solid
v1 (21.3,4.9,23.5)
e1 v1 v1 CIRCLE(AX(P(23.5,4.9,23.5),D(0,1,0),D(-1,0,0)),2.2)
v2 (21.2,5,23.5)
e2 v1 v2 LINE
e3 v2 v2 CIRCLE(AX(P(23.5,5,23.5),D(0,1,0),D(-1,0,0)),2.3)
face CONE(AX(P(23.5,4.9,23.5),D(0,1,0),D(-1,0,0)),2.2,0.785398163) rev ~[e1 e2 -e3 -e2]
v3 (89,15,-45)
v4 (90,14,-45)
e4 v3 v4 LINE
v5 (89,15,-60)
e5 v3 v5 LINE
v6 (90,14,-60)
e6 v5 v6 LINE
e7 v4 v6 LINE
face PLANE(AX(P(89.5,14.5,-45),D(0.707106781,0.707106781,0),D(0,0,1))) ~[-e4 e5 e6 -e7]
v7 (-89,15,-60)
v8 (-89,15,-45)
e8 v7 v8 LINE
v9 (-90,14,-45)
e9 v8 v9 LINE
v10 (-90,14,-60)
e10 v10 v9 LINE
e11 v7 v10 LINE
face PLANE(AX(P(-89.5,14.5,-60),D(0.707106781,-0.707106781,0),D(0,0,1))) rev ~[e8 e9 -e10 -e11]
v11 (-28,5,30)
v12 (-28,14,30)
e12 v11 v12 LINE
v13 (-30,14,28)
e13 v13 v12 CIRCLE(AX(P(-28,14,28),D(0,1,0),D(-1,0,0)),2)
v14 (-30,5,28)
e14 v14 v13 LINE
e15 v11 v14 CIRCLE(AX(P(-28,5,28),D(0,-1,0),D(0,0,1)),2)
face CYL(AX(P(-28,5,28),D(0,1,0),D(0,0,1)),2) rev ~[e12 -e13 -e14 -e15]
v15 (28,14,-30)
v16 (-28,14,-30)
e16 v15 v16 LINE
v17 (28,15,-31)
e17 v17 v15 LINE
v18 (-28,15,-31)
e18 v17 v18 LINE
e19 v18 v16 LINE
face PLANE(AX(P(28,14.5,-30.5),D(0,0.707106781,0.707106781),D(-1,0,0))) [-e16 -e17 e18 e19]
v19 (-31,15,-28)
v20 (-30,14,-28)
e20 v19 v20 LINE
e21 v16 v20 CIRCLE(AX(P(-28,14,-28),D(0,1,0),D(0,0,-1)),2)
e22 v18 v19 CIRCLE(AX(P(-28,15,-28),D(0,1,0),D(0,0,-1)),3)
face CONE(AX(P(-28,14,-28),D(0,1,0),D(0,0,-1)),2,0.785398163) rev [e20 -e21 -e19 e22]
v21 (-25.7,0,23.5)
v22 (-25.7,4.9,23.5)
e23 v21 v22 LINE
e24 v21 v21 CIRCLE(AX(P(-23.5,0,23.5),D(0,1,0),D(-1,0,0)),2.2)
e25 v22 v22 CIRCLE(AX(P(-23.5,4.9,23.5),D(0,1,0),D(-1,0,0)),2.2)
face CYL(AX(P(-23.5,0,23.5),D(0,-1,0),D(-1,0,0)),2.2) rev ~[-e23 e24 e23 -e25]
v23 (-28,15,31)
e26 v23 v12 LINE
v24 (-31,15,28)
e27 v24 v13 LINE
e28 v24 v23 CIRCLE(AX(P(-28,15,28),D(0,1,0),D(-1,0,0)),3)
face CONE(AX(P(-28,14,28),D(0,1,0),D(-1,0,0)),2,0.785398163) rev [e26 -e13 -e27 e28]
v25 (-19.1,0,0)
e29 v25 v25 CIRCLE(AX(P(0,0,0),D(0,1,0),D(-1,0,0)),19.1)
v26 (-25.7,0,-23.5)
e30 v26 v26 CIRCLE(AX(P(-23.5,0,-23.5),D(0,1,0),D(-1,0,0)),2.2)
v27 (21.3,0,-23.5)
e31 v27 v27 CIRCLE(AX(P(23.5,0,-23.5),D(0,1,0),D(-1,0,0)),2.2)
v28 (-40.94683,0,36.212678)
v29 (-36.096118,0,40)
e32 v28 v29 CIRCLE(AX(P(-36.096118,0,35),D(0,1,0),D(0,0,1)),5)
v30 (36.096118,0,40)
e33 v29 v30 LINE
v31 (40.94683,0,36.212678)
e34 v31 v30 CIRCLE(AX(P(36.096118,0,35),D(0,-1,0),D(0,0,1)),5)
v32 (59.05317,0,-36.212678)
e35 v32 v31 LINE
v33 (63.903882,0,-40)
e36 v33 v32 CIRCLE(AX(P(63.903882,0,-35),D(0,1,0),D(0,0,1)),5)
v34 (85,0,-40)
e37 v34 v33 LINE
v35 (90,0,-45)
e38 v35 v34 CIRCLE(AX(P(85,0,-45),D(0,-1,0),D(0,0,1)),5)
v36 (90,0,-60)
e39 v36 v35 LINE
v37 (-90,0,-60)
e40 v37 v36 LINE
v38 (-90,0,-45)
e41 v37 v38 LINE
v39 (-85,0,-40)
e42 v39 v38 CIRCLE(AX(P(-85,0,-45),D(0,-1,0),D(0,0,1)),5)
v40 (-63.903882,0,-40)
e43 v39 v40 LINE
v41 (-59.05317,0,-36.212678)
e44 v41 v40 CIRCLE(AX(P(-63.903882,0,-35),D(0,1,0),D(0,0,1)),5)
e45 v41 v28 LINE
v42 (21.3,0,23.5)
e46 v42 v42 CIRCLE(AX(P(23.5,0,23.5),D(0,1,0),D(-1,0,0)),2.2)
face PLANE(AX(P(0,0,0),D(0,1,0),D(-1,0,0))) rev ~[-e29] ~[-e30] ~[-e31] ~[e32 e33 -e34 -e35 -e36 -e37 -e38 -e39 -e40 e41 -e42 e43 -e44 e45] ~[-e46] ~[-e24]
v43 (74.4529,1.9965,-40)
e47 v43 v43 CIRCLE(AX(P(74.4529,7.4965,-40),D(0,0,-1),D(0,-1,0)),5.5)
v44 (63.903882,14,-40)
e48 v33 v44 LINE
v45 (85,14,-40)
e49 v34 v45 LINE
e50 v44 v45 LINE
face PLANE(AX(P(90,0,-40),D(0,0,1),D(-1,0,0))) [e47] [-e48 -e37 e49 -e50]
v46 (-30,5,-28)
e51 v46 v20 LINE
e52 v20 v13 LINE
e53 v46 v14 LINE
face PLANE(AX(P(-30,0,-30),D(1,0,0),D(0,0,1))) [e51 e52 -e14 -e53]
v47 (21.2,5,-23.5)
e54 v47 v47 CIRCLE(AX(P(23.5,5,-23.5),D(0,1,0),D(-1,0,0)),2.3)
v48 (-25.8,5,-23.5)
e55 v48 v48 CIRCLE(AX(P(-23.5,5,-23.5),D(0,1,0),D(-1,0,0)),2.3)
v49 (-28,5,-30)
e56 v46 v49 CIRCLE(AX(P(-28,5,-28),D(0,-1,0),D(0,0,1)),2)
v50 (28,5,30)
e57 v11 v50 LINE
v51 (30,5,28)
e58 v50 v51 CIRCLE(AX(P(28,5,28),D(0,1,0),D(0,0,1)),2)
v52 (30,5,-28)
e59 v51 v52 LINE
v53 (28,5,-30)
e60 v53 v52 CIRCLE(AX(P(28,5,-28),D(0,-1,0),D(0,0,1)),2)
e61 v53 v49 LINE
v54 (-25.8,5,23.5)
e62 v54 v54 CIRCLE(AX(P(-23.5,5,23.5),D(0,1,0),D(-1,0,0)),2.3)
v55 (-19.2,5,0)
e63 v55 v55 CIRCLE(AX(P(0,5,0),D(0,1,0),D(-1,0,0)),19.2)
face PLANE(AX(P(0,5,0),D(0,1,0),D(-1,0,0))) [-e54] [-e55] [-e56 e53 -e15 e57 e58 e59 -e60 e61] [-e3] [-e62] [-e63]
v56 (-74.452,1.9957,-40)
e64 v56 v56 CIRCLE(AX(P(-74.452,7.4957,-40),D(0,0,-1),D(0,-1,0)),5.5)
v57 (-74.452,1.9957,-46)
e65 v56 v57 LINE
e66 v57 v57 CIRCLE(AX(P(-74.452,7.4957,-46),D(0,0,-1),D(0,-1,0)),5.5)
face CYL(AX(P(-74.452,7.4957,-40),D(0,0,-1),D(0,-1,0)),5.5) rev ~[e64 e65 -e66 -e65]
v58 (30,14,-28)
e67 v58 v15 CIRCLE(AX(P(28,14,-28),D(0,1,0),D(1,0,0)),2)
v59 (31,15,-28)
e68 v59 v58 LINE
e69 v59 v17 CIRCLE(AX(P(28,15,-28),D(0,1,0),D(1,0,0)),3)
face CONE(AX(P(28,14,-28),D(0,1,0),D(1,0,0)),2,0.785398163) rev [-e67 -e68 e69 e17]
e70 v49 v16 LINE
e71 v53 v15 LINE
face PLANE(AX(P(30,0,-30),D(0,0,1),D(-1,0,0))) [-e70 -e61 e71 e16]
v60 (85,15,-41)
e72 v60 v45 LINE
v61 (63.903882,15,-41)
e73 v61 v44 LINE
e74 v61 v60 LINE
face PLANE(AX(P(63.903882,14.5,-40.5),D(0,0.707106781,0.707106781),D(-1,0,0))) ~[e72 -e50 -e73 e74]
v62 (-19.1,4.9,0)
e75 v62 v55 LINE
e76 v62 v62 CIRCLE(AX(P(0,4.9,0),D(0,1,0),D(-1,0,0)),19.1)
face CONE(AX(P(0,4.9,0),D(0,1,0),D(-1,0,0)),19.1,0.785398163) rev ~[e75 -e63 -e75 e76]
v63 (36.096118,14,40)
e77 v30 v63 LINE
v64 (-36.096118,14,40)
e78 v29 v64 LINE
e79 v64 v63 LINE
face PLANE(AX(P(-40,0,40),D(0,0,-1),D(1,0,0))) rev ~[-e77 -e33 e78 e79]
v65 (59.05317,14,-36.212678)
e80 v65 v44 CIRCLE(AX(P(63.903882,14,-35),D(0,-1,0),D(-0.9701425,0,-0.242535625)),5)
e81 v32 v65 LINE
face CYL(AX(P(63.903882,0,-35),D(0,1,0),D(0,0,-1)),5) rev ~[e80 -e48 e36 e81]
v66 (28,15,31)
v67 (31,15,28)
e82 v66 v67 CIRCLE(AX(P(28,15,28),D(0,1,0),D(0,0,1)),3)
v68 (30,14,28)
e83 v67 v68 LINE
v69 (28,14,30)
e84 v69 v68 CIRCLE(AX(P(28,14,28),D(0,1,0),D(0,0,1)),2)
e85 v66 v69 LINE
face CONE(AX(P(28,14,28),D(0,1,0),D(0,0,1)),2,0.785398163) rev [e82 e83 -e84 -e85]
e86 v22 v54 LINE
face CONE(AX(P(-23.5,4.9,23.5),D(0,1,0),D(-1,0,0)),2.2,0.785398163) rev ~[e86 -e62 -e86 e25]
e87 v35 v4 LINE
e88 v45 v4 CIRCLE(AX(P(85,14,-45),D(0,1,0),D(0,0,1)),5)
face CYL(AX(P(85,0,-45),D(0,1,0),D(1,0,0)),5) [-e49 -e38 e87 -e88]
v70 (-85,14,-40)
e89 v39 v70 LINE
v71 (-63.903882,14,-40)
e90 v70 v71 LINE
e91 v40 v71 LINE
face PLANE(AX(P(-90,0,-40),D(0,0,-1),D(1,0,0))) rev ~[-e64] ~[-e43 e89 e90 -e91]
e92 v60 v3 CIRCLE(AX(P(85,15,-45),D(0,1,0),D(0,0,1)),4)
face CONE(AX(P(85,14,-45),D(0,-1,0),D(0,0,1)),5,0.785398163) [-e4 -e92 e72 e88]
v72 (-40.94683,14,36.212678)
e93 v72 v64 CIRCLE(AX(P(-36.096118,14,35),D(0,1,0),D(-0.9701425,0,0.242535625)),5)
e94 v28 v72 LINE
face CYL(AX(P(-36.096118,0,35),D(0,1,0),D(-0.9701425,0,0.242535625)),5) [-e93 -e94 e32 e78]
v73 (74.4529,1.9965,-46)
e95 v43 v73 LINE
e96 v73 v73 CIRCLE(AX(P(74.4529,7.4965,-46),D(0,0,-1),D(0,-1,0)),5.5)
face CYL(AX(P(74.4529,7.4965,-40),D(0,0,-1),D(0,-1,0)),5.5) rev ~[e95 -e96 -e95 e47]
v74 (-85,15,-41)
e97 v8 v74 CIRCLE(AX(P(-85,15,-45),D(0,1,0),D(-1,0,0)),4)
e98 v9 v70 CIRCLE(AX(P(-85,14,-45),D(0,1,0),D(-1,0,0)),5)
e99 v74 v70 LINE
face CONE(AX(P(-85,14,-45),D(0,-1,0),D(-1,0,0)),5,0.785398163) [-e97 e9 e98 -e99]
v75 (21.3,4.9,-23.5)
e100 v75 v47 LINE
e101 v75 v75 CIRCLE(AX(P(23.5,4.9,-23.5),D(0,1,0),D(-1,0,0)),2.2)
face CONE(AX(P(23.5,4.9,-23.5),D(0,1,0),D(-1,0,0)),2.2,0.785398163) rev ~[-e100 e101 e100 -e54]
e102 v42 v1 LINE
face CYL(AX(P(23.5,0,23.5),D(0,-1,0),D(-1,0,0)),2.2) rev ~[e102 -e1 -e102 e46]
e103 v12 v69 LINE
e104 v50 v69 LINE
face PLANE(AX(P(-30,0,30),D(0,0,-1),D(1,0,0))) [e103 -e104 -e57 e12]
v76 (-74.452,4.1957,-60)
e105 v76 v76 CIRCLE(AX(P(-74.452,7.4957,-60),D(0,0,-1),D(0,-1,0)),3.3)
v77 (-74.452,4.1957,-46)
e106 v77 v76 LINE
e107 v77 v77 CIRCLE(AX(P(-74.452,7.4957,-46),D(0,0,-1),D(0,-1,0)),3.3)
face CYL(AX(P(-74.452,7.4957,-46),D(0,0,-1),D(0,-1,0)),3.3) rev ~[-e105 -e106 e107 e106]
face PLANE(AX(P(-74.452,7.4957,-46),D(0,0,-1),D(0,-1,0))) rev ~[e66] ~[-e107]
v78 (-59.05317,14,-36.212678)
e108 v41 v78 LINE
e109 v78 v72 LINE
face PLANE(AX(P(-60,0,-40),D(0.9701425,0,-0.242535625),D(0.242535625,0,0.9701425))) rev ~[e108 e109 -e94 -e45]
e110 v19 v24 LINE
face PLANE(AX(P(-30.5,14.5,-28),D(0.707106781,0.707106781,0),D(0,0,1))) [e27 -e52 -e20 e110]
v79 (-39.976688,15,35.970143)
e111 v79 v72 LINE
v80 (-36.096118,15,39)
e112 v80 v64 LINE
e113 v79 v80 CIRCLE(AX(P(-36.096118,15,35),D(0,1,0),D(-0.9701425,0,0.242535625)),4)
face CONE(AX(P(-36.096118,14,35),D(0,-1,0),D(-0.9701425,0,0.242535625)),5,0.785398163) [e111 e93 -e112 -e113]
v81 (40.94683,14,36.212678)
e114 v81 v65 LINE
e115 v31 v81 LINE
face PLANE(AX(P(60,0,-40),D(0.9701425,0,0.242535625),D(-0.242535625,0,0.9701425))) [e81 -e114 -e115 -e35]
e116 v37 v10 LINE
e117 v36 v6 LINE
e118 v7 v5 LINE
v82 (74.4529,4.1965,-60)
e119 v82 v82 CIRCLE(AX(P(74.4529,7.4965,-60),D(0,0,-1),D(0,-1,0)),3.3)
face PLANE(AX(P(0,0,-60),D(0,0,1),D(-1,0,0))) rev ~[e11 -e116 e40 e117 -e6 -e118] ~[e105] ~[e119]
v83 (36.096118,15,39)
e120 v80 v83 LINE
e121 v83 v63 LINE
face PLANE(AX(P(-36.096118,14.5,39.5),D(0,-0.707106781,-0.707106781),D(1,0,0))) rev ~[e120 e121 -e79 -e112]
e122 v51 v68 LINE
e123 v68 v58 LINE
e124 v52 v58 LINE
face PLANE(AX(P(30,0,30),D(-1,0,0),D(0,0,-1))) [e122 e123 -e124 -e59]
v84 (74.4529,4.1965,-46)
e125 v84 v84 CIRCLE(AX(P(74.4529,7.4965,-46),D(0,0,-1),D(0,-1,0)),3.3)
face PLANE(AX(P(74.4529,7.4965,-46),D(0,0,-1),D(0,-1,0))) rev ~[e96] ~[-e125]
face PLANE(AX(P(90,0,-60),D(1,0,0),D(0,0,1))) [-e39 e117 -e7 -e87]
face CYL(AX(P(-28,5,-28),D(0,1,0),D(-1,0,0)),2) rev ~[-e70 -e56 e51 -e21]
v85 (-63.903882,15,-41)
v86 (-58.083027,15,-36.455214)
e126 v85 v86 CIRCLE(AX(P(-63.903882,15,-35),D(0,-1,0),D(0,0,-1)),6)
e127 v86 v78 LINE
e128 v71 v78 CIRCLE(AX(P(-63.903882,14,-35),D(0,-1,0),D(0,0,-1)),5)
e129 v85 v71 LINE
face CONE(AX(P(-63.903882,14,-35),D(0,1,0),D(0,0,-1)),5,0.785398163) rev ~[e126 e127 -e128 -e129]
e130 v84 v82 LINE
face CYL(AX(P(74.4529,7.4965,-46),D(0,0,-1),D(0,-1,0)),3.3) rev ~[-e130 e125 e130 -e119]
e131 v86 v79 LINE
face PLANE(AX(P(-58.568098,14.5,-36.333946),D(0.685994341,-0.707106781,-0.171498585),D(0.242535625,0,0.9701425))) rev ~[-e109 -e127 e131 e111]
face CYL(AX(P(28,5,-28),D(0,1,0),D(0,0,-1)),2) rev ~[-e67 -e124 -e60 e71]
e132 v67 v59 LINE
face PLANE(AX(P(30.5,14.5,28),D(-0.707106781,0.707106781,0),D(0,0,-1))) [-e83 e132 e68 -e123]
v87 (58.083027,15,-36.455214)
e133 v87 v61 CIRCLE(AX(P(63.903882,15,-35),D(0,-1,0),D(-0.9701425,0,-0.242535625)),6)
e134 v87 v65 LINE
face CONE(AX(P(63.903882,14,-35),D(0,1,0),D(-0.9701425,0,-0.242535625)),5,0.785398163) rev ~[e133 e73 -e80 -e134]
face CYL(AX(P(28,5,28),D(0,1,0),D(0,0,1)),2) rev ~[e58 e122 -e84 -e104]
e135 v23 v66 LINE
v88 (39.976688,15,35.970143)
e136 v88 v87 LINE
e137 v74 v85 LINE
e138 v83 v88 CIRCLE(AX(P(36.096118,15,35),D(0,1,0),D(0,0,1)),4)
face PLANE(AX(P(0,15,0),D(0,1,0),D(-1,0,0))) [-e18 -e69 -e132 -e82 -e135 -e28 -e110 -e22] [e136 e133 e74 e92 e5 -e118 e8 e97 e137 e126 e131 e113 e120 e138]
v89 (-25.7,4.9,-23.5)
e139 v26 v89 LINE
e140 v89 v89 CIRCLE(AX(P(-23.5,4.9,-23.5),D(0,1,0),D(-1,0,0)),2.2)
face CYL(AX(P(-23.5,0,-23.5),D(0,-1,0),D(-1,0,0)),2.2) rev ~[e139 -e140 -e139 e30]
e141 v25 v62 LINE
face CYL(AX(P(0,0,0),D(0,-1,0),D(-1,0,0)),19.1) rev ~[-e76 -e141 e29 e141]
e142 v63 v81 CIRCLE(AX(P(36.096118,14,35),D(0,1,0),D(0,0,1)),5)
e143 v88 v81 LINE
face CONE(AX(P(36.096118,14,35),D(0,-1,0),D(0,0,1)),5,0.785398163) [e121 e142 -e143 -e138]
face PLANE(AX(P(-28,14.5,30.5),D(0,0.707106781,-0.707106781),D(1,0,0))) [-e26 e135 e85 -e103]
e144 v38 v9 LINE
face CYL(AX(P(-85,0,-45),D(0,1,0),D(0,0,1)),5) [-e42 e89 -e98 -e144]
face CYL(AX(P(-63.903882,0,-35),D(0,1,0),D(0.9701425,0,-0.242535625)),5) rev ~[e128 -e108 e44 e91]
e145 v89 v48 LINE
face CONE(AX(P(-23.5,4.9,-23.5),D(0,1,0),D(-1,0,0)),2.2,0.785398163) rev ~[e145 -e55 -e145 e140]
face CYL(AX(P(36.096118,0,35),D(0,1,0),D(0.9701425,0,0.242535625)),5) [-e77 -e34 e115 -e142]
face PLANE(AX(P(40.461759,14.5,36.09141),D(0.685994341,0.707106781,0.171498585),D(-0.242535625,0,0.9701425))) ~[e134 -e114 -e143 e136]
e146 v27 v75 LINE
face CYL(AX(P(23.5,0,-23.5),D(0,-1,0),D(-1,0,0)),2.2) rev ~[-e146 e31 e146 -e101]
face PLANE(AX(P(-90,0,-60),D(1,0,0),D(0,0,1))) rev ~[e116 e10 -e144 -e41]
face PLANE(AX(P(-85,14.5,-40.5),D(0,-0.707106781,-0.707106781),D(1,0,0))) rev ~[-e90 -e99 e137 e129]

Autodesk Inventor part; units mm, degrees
ref_plane "YZ Plane" through (0, 0, 0) normal (1, 0, 0) x (0, 1, 0)
ref_plane "XZ Plane" through (0, 0, 0) normal (0, 1, 0) x (-1, 0, 0)
ref_plane "XY Plane" through (0, 0, 0) normal (0, 0, 1) x (1, 0, 0)
sketch "Skizze1" plane through (0, 0, 0) normal (0, 1, 0) x (-1, 0, 0)
  circle A0 centre (0, 0) radius 19.1
  line L0 (23.5, 23.5) -> (-23.5, 23.5) construction
  line L1 (-23.5, 23.5) -> (-23.5, -23.5) construction
  line L2 (-23.5, -23.5) -> (23.5, -23.5) construction
  line L3 (23.5, -23.5) -> (23.5, 23.5) construction
  line L4 (23.5, 23.5) -> (-23.5, -23.5) construction
  line L5 (-23.5, 23.5) -> (23.5, -23.5) construction
  circle A1 centre (23.5, 23.5) radius 2.2
  circle A2 centre (23.5, -23.5) radius 2.2
  circle A3 centre (-23.5, -23.5) radius 2.2
  circle A4 centre (-23.5, 23.5) radius 2.2
  line L6 (30, 30) -> (-30, 30)
  line L7 (-30, 30) -> (-30, -30)
  line L8 (-30, -30) -> (30, -30)
  line L9 (30, -30) -> (30, 30)
  line L10 (30, 30) -> (-30, -30) construction
  line L11 (-30, 30) -> (30, -30) construction
  line L12 (40, 40) -> (-40, 40)
  line L13 (-40, 40) -> (-40, -40) construction
  line L14 (-40, -40) -> (40, -40) construction
  line L15 (40, -40) -> (40, 40) construction
  line L16 (40, 40) -> (-40, -40) construction
  line L17 (-40, 40) -> (40, -40) construction
  line L18 (0, -40) -> (0, -60) construction
  line L19 (0, -40) -> (20, -40) construction
  line L20 (0, -60) -> (-90, -60)
  line L21 (-90, -60) -> (-90, -40)
  line L22 (-90, -40) -> (-60, -40)
  line L23 (-60, -40) -> (-40, 40)
  line L24 (0, -60) -> (90, -60)
  line L25 (0, -60) -> (90, -60) construction
  line L26 (90, -60) -> (90, -40)
  line L27 (90, -40) -> (60, -40)
  line L28 (60, -40) -> (40, 40)
  dimension "d0" = 38.2
  dimension "d1" = 47
  dimension "d2" = 47
  dimension "d3" = 4.4
  dimension "d4" = 4.4
  dimension "d5" = 4.4
  dimension "d6" = 4.4
  dimension "d7" = 60
  dimension "d8" = 60
  dimension "d9" = 80
  dimension "d10" = 80
  dimension "d11" = 20
  dimension "d12" = 90
  dimension "d13" = 90
  dimension "d14" = 20
  dimension "d15" = 30
  dimension "d16" = 90
  dimension "d17" = 0
  dimension "d18" = 20
  dimension "d19" = 30
extrude "Extrusion1" add sketch "Skizze1" along normal blind 5 contours L9 L8 L7 L6
extrude "Extrusion2" add sketch "Skizze1" along normal blind 15 contours L28 L27 L26 L24 L20 L21 L22 L23 L12
fillet "Rundung1" radius 5 6 edges at (-90, 7.5, -40) (-60, 7.5, -40) (60, 7.5, -40) (90, 7.5, -40) (40, 7.5, 40) (-40, 7.5, 40)
fillet "Rundung2" radius 2 4 edges at (-30, 10, -30) (30, 10, -30) (30, 10, 30) (-30, 10, 30)
chamfer "Fase1" distance 1 angle 45 21 edges at (-74.4519, 15, -40) (-60.8268, 15, -38.941) (-50, 15, 0) (-39.1732, 15, 38.941) (0, 15, 40) (39.1732, 15, 38.941) (50, 15, 0) (60.8268, 15, -38.941) (74.4519, 15, -40) (88.5355, 15, -41.4645) (90, 15, -52.5) (-88.5355, 15, -41.4645) (-90, 15, -52.5) (-30, 15, 0) (-29.4142, 15, -29.4142) (0, 15, -30) (29.4142, 15, -29.4142) (30, 15, 0) (29.4142, 15, 29.4142) (0, 15, 30) (-29.4142, 15, 29.4142)
chamfer "Fase2" distance 0.1 angle 45 5 edges at (-21.3, 5, -23.5) (25.7, 5, -23.5) (19.1, 5, 0) (25.7, 5, 23.5) (-21.3, 5, 23.5)
thread "Gewinde1" size "M5x0.8" class "6H" standard "ANSI Metric M Profile" full length
thread "Gewinde2" size "M5x0.8" class "6H" standard "ANSI Metric M Profile" full length
sketch "Skizze2" plane through (-85, 0, -40) normal (0, 0, 1) x (1, 0, 0)
  line L0 (0, 0) -> (0, 14) construction
  line L1 (0, 14) -> (0, 15) construction
  line L2 (21.0961, 15) -> (0, 15) construction
  line L3 (21.0961, 14) -> (21.0961, 15) construction
  line L4 (21.0961, 14) -> (21.0961, 0) construction
  line L5 (0, 0) -> (21.0961, 0) construction
  line L6 (148.9039, 0) -> (148.9039, 14) construction
  line L7 (148.9039, 14) -> (148.9039, 15) construction
  line L8 (170, 15) -> (148.9039, 15) construction
  line L9 (170, 14) -> (170, 15) construction
  line L10 (170, 14) -> (170, 0) construction
  line L11 (148.9039, 0) -> (170, 0) construction
  line L12 (0, 15) -> (21.0961, 0)
  line L13 (21.0961, 15) -> (0, 0)
  line L14 (175, 0) -> (170, 0) construction
  line L15 (148.9039, 15) -> (170, 0)
  line L16 (170, 15) -> (148.9039, 0)
  point P0 (85, 0)
sketch "Skizze3" plane through (-85, 0, -40) normal (0, 0, 1) x (1, 0, 0)
  point P0 (85, 0)
  point P1 (10.548, 7.4957)
  point P2 (159.4529, 7.4965)
hole "Bohrung1" at (-74.452, 7.4957, -40) at (74.4529, 7.4965, -40) direction (0, 0, -1) diameter 6.6 end through all counterbore diameter 11 counterbore depth 6 clearance for "Innensechskantkopfschraube" size "M6" standard "ANSI Metrisches M Profil"
properties part number "Y-Motorhalter" material "Aluminium 6061"
